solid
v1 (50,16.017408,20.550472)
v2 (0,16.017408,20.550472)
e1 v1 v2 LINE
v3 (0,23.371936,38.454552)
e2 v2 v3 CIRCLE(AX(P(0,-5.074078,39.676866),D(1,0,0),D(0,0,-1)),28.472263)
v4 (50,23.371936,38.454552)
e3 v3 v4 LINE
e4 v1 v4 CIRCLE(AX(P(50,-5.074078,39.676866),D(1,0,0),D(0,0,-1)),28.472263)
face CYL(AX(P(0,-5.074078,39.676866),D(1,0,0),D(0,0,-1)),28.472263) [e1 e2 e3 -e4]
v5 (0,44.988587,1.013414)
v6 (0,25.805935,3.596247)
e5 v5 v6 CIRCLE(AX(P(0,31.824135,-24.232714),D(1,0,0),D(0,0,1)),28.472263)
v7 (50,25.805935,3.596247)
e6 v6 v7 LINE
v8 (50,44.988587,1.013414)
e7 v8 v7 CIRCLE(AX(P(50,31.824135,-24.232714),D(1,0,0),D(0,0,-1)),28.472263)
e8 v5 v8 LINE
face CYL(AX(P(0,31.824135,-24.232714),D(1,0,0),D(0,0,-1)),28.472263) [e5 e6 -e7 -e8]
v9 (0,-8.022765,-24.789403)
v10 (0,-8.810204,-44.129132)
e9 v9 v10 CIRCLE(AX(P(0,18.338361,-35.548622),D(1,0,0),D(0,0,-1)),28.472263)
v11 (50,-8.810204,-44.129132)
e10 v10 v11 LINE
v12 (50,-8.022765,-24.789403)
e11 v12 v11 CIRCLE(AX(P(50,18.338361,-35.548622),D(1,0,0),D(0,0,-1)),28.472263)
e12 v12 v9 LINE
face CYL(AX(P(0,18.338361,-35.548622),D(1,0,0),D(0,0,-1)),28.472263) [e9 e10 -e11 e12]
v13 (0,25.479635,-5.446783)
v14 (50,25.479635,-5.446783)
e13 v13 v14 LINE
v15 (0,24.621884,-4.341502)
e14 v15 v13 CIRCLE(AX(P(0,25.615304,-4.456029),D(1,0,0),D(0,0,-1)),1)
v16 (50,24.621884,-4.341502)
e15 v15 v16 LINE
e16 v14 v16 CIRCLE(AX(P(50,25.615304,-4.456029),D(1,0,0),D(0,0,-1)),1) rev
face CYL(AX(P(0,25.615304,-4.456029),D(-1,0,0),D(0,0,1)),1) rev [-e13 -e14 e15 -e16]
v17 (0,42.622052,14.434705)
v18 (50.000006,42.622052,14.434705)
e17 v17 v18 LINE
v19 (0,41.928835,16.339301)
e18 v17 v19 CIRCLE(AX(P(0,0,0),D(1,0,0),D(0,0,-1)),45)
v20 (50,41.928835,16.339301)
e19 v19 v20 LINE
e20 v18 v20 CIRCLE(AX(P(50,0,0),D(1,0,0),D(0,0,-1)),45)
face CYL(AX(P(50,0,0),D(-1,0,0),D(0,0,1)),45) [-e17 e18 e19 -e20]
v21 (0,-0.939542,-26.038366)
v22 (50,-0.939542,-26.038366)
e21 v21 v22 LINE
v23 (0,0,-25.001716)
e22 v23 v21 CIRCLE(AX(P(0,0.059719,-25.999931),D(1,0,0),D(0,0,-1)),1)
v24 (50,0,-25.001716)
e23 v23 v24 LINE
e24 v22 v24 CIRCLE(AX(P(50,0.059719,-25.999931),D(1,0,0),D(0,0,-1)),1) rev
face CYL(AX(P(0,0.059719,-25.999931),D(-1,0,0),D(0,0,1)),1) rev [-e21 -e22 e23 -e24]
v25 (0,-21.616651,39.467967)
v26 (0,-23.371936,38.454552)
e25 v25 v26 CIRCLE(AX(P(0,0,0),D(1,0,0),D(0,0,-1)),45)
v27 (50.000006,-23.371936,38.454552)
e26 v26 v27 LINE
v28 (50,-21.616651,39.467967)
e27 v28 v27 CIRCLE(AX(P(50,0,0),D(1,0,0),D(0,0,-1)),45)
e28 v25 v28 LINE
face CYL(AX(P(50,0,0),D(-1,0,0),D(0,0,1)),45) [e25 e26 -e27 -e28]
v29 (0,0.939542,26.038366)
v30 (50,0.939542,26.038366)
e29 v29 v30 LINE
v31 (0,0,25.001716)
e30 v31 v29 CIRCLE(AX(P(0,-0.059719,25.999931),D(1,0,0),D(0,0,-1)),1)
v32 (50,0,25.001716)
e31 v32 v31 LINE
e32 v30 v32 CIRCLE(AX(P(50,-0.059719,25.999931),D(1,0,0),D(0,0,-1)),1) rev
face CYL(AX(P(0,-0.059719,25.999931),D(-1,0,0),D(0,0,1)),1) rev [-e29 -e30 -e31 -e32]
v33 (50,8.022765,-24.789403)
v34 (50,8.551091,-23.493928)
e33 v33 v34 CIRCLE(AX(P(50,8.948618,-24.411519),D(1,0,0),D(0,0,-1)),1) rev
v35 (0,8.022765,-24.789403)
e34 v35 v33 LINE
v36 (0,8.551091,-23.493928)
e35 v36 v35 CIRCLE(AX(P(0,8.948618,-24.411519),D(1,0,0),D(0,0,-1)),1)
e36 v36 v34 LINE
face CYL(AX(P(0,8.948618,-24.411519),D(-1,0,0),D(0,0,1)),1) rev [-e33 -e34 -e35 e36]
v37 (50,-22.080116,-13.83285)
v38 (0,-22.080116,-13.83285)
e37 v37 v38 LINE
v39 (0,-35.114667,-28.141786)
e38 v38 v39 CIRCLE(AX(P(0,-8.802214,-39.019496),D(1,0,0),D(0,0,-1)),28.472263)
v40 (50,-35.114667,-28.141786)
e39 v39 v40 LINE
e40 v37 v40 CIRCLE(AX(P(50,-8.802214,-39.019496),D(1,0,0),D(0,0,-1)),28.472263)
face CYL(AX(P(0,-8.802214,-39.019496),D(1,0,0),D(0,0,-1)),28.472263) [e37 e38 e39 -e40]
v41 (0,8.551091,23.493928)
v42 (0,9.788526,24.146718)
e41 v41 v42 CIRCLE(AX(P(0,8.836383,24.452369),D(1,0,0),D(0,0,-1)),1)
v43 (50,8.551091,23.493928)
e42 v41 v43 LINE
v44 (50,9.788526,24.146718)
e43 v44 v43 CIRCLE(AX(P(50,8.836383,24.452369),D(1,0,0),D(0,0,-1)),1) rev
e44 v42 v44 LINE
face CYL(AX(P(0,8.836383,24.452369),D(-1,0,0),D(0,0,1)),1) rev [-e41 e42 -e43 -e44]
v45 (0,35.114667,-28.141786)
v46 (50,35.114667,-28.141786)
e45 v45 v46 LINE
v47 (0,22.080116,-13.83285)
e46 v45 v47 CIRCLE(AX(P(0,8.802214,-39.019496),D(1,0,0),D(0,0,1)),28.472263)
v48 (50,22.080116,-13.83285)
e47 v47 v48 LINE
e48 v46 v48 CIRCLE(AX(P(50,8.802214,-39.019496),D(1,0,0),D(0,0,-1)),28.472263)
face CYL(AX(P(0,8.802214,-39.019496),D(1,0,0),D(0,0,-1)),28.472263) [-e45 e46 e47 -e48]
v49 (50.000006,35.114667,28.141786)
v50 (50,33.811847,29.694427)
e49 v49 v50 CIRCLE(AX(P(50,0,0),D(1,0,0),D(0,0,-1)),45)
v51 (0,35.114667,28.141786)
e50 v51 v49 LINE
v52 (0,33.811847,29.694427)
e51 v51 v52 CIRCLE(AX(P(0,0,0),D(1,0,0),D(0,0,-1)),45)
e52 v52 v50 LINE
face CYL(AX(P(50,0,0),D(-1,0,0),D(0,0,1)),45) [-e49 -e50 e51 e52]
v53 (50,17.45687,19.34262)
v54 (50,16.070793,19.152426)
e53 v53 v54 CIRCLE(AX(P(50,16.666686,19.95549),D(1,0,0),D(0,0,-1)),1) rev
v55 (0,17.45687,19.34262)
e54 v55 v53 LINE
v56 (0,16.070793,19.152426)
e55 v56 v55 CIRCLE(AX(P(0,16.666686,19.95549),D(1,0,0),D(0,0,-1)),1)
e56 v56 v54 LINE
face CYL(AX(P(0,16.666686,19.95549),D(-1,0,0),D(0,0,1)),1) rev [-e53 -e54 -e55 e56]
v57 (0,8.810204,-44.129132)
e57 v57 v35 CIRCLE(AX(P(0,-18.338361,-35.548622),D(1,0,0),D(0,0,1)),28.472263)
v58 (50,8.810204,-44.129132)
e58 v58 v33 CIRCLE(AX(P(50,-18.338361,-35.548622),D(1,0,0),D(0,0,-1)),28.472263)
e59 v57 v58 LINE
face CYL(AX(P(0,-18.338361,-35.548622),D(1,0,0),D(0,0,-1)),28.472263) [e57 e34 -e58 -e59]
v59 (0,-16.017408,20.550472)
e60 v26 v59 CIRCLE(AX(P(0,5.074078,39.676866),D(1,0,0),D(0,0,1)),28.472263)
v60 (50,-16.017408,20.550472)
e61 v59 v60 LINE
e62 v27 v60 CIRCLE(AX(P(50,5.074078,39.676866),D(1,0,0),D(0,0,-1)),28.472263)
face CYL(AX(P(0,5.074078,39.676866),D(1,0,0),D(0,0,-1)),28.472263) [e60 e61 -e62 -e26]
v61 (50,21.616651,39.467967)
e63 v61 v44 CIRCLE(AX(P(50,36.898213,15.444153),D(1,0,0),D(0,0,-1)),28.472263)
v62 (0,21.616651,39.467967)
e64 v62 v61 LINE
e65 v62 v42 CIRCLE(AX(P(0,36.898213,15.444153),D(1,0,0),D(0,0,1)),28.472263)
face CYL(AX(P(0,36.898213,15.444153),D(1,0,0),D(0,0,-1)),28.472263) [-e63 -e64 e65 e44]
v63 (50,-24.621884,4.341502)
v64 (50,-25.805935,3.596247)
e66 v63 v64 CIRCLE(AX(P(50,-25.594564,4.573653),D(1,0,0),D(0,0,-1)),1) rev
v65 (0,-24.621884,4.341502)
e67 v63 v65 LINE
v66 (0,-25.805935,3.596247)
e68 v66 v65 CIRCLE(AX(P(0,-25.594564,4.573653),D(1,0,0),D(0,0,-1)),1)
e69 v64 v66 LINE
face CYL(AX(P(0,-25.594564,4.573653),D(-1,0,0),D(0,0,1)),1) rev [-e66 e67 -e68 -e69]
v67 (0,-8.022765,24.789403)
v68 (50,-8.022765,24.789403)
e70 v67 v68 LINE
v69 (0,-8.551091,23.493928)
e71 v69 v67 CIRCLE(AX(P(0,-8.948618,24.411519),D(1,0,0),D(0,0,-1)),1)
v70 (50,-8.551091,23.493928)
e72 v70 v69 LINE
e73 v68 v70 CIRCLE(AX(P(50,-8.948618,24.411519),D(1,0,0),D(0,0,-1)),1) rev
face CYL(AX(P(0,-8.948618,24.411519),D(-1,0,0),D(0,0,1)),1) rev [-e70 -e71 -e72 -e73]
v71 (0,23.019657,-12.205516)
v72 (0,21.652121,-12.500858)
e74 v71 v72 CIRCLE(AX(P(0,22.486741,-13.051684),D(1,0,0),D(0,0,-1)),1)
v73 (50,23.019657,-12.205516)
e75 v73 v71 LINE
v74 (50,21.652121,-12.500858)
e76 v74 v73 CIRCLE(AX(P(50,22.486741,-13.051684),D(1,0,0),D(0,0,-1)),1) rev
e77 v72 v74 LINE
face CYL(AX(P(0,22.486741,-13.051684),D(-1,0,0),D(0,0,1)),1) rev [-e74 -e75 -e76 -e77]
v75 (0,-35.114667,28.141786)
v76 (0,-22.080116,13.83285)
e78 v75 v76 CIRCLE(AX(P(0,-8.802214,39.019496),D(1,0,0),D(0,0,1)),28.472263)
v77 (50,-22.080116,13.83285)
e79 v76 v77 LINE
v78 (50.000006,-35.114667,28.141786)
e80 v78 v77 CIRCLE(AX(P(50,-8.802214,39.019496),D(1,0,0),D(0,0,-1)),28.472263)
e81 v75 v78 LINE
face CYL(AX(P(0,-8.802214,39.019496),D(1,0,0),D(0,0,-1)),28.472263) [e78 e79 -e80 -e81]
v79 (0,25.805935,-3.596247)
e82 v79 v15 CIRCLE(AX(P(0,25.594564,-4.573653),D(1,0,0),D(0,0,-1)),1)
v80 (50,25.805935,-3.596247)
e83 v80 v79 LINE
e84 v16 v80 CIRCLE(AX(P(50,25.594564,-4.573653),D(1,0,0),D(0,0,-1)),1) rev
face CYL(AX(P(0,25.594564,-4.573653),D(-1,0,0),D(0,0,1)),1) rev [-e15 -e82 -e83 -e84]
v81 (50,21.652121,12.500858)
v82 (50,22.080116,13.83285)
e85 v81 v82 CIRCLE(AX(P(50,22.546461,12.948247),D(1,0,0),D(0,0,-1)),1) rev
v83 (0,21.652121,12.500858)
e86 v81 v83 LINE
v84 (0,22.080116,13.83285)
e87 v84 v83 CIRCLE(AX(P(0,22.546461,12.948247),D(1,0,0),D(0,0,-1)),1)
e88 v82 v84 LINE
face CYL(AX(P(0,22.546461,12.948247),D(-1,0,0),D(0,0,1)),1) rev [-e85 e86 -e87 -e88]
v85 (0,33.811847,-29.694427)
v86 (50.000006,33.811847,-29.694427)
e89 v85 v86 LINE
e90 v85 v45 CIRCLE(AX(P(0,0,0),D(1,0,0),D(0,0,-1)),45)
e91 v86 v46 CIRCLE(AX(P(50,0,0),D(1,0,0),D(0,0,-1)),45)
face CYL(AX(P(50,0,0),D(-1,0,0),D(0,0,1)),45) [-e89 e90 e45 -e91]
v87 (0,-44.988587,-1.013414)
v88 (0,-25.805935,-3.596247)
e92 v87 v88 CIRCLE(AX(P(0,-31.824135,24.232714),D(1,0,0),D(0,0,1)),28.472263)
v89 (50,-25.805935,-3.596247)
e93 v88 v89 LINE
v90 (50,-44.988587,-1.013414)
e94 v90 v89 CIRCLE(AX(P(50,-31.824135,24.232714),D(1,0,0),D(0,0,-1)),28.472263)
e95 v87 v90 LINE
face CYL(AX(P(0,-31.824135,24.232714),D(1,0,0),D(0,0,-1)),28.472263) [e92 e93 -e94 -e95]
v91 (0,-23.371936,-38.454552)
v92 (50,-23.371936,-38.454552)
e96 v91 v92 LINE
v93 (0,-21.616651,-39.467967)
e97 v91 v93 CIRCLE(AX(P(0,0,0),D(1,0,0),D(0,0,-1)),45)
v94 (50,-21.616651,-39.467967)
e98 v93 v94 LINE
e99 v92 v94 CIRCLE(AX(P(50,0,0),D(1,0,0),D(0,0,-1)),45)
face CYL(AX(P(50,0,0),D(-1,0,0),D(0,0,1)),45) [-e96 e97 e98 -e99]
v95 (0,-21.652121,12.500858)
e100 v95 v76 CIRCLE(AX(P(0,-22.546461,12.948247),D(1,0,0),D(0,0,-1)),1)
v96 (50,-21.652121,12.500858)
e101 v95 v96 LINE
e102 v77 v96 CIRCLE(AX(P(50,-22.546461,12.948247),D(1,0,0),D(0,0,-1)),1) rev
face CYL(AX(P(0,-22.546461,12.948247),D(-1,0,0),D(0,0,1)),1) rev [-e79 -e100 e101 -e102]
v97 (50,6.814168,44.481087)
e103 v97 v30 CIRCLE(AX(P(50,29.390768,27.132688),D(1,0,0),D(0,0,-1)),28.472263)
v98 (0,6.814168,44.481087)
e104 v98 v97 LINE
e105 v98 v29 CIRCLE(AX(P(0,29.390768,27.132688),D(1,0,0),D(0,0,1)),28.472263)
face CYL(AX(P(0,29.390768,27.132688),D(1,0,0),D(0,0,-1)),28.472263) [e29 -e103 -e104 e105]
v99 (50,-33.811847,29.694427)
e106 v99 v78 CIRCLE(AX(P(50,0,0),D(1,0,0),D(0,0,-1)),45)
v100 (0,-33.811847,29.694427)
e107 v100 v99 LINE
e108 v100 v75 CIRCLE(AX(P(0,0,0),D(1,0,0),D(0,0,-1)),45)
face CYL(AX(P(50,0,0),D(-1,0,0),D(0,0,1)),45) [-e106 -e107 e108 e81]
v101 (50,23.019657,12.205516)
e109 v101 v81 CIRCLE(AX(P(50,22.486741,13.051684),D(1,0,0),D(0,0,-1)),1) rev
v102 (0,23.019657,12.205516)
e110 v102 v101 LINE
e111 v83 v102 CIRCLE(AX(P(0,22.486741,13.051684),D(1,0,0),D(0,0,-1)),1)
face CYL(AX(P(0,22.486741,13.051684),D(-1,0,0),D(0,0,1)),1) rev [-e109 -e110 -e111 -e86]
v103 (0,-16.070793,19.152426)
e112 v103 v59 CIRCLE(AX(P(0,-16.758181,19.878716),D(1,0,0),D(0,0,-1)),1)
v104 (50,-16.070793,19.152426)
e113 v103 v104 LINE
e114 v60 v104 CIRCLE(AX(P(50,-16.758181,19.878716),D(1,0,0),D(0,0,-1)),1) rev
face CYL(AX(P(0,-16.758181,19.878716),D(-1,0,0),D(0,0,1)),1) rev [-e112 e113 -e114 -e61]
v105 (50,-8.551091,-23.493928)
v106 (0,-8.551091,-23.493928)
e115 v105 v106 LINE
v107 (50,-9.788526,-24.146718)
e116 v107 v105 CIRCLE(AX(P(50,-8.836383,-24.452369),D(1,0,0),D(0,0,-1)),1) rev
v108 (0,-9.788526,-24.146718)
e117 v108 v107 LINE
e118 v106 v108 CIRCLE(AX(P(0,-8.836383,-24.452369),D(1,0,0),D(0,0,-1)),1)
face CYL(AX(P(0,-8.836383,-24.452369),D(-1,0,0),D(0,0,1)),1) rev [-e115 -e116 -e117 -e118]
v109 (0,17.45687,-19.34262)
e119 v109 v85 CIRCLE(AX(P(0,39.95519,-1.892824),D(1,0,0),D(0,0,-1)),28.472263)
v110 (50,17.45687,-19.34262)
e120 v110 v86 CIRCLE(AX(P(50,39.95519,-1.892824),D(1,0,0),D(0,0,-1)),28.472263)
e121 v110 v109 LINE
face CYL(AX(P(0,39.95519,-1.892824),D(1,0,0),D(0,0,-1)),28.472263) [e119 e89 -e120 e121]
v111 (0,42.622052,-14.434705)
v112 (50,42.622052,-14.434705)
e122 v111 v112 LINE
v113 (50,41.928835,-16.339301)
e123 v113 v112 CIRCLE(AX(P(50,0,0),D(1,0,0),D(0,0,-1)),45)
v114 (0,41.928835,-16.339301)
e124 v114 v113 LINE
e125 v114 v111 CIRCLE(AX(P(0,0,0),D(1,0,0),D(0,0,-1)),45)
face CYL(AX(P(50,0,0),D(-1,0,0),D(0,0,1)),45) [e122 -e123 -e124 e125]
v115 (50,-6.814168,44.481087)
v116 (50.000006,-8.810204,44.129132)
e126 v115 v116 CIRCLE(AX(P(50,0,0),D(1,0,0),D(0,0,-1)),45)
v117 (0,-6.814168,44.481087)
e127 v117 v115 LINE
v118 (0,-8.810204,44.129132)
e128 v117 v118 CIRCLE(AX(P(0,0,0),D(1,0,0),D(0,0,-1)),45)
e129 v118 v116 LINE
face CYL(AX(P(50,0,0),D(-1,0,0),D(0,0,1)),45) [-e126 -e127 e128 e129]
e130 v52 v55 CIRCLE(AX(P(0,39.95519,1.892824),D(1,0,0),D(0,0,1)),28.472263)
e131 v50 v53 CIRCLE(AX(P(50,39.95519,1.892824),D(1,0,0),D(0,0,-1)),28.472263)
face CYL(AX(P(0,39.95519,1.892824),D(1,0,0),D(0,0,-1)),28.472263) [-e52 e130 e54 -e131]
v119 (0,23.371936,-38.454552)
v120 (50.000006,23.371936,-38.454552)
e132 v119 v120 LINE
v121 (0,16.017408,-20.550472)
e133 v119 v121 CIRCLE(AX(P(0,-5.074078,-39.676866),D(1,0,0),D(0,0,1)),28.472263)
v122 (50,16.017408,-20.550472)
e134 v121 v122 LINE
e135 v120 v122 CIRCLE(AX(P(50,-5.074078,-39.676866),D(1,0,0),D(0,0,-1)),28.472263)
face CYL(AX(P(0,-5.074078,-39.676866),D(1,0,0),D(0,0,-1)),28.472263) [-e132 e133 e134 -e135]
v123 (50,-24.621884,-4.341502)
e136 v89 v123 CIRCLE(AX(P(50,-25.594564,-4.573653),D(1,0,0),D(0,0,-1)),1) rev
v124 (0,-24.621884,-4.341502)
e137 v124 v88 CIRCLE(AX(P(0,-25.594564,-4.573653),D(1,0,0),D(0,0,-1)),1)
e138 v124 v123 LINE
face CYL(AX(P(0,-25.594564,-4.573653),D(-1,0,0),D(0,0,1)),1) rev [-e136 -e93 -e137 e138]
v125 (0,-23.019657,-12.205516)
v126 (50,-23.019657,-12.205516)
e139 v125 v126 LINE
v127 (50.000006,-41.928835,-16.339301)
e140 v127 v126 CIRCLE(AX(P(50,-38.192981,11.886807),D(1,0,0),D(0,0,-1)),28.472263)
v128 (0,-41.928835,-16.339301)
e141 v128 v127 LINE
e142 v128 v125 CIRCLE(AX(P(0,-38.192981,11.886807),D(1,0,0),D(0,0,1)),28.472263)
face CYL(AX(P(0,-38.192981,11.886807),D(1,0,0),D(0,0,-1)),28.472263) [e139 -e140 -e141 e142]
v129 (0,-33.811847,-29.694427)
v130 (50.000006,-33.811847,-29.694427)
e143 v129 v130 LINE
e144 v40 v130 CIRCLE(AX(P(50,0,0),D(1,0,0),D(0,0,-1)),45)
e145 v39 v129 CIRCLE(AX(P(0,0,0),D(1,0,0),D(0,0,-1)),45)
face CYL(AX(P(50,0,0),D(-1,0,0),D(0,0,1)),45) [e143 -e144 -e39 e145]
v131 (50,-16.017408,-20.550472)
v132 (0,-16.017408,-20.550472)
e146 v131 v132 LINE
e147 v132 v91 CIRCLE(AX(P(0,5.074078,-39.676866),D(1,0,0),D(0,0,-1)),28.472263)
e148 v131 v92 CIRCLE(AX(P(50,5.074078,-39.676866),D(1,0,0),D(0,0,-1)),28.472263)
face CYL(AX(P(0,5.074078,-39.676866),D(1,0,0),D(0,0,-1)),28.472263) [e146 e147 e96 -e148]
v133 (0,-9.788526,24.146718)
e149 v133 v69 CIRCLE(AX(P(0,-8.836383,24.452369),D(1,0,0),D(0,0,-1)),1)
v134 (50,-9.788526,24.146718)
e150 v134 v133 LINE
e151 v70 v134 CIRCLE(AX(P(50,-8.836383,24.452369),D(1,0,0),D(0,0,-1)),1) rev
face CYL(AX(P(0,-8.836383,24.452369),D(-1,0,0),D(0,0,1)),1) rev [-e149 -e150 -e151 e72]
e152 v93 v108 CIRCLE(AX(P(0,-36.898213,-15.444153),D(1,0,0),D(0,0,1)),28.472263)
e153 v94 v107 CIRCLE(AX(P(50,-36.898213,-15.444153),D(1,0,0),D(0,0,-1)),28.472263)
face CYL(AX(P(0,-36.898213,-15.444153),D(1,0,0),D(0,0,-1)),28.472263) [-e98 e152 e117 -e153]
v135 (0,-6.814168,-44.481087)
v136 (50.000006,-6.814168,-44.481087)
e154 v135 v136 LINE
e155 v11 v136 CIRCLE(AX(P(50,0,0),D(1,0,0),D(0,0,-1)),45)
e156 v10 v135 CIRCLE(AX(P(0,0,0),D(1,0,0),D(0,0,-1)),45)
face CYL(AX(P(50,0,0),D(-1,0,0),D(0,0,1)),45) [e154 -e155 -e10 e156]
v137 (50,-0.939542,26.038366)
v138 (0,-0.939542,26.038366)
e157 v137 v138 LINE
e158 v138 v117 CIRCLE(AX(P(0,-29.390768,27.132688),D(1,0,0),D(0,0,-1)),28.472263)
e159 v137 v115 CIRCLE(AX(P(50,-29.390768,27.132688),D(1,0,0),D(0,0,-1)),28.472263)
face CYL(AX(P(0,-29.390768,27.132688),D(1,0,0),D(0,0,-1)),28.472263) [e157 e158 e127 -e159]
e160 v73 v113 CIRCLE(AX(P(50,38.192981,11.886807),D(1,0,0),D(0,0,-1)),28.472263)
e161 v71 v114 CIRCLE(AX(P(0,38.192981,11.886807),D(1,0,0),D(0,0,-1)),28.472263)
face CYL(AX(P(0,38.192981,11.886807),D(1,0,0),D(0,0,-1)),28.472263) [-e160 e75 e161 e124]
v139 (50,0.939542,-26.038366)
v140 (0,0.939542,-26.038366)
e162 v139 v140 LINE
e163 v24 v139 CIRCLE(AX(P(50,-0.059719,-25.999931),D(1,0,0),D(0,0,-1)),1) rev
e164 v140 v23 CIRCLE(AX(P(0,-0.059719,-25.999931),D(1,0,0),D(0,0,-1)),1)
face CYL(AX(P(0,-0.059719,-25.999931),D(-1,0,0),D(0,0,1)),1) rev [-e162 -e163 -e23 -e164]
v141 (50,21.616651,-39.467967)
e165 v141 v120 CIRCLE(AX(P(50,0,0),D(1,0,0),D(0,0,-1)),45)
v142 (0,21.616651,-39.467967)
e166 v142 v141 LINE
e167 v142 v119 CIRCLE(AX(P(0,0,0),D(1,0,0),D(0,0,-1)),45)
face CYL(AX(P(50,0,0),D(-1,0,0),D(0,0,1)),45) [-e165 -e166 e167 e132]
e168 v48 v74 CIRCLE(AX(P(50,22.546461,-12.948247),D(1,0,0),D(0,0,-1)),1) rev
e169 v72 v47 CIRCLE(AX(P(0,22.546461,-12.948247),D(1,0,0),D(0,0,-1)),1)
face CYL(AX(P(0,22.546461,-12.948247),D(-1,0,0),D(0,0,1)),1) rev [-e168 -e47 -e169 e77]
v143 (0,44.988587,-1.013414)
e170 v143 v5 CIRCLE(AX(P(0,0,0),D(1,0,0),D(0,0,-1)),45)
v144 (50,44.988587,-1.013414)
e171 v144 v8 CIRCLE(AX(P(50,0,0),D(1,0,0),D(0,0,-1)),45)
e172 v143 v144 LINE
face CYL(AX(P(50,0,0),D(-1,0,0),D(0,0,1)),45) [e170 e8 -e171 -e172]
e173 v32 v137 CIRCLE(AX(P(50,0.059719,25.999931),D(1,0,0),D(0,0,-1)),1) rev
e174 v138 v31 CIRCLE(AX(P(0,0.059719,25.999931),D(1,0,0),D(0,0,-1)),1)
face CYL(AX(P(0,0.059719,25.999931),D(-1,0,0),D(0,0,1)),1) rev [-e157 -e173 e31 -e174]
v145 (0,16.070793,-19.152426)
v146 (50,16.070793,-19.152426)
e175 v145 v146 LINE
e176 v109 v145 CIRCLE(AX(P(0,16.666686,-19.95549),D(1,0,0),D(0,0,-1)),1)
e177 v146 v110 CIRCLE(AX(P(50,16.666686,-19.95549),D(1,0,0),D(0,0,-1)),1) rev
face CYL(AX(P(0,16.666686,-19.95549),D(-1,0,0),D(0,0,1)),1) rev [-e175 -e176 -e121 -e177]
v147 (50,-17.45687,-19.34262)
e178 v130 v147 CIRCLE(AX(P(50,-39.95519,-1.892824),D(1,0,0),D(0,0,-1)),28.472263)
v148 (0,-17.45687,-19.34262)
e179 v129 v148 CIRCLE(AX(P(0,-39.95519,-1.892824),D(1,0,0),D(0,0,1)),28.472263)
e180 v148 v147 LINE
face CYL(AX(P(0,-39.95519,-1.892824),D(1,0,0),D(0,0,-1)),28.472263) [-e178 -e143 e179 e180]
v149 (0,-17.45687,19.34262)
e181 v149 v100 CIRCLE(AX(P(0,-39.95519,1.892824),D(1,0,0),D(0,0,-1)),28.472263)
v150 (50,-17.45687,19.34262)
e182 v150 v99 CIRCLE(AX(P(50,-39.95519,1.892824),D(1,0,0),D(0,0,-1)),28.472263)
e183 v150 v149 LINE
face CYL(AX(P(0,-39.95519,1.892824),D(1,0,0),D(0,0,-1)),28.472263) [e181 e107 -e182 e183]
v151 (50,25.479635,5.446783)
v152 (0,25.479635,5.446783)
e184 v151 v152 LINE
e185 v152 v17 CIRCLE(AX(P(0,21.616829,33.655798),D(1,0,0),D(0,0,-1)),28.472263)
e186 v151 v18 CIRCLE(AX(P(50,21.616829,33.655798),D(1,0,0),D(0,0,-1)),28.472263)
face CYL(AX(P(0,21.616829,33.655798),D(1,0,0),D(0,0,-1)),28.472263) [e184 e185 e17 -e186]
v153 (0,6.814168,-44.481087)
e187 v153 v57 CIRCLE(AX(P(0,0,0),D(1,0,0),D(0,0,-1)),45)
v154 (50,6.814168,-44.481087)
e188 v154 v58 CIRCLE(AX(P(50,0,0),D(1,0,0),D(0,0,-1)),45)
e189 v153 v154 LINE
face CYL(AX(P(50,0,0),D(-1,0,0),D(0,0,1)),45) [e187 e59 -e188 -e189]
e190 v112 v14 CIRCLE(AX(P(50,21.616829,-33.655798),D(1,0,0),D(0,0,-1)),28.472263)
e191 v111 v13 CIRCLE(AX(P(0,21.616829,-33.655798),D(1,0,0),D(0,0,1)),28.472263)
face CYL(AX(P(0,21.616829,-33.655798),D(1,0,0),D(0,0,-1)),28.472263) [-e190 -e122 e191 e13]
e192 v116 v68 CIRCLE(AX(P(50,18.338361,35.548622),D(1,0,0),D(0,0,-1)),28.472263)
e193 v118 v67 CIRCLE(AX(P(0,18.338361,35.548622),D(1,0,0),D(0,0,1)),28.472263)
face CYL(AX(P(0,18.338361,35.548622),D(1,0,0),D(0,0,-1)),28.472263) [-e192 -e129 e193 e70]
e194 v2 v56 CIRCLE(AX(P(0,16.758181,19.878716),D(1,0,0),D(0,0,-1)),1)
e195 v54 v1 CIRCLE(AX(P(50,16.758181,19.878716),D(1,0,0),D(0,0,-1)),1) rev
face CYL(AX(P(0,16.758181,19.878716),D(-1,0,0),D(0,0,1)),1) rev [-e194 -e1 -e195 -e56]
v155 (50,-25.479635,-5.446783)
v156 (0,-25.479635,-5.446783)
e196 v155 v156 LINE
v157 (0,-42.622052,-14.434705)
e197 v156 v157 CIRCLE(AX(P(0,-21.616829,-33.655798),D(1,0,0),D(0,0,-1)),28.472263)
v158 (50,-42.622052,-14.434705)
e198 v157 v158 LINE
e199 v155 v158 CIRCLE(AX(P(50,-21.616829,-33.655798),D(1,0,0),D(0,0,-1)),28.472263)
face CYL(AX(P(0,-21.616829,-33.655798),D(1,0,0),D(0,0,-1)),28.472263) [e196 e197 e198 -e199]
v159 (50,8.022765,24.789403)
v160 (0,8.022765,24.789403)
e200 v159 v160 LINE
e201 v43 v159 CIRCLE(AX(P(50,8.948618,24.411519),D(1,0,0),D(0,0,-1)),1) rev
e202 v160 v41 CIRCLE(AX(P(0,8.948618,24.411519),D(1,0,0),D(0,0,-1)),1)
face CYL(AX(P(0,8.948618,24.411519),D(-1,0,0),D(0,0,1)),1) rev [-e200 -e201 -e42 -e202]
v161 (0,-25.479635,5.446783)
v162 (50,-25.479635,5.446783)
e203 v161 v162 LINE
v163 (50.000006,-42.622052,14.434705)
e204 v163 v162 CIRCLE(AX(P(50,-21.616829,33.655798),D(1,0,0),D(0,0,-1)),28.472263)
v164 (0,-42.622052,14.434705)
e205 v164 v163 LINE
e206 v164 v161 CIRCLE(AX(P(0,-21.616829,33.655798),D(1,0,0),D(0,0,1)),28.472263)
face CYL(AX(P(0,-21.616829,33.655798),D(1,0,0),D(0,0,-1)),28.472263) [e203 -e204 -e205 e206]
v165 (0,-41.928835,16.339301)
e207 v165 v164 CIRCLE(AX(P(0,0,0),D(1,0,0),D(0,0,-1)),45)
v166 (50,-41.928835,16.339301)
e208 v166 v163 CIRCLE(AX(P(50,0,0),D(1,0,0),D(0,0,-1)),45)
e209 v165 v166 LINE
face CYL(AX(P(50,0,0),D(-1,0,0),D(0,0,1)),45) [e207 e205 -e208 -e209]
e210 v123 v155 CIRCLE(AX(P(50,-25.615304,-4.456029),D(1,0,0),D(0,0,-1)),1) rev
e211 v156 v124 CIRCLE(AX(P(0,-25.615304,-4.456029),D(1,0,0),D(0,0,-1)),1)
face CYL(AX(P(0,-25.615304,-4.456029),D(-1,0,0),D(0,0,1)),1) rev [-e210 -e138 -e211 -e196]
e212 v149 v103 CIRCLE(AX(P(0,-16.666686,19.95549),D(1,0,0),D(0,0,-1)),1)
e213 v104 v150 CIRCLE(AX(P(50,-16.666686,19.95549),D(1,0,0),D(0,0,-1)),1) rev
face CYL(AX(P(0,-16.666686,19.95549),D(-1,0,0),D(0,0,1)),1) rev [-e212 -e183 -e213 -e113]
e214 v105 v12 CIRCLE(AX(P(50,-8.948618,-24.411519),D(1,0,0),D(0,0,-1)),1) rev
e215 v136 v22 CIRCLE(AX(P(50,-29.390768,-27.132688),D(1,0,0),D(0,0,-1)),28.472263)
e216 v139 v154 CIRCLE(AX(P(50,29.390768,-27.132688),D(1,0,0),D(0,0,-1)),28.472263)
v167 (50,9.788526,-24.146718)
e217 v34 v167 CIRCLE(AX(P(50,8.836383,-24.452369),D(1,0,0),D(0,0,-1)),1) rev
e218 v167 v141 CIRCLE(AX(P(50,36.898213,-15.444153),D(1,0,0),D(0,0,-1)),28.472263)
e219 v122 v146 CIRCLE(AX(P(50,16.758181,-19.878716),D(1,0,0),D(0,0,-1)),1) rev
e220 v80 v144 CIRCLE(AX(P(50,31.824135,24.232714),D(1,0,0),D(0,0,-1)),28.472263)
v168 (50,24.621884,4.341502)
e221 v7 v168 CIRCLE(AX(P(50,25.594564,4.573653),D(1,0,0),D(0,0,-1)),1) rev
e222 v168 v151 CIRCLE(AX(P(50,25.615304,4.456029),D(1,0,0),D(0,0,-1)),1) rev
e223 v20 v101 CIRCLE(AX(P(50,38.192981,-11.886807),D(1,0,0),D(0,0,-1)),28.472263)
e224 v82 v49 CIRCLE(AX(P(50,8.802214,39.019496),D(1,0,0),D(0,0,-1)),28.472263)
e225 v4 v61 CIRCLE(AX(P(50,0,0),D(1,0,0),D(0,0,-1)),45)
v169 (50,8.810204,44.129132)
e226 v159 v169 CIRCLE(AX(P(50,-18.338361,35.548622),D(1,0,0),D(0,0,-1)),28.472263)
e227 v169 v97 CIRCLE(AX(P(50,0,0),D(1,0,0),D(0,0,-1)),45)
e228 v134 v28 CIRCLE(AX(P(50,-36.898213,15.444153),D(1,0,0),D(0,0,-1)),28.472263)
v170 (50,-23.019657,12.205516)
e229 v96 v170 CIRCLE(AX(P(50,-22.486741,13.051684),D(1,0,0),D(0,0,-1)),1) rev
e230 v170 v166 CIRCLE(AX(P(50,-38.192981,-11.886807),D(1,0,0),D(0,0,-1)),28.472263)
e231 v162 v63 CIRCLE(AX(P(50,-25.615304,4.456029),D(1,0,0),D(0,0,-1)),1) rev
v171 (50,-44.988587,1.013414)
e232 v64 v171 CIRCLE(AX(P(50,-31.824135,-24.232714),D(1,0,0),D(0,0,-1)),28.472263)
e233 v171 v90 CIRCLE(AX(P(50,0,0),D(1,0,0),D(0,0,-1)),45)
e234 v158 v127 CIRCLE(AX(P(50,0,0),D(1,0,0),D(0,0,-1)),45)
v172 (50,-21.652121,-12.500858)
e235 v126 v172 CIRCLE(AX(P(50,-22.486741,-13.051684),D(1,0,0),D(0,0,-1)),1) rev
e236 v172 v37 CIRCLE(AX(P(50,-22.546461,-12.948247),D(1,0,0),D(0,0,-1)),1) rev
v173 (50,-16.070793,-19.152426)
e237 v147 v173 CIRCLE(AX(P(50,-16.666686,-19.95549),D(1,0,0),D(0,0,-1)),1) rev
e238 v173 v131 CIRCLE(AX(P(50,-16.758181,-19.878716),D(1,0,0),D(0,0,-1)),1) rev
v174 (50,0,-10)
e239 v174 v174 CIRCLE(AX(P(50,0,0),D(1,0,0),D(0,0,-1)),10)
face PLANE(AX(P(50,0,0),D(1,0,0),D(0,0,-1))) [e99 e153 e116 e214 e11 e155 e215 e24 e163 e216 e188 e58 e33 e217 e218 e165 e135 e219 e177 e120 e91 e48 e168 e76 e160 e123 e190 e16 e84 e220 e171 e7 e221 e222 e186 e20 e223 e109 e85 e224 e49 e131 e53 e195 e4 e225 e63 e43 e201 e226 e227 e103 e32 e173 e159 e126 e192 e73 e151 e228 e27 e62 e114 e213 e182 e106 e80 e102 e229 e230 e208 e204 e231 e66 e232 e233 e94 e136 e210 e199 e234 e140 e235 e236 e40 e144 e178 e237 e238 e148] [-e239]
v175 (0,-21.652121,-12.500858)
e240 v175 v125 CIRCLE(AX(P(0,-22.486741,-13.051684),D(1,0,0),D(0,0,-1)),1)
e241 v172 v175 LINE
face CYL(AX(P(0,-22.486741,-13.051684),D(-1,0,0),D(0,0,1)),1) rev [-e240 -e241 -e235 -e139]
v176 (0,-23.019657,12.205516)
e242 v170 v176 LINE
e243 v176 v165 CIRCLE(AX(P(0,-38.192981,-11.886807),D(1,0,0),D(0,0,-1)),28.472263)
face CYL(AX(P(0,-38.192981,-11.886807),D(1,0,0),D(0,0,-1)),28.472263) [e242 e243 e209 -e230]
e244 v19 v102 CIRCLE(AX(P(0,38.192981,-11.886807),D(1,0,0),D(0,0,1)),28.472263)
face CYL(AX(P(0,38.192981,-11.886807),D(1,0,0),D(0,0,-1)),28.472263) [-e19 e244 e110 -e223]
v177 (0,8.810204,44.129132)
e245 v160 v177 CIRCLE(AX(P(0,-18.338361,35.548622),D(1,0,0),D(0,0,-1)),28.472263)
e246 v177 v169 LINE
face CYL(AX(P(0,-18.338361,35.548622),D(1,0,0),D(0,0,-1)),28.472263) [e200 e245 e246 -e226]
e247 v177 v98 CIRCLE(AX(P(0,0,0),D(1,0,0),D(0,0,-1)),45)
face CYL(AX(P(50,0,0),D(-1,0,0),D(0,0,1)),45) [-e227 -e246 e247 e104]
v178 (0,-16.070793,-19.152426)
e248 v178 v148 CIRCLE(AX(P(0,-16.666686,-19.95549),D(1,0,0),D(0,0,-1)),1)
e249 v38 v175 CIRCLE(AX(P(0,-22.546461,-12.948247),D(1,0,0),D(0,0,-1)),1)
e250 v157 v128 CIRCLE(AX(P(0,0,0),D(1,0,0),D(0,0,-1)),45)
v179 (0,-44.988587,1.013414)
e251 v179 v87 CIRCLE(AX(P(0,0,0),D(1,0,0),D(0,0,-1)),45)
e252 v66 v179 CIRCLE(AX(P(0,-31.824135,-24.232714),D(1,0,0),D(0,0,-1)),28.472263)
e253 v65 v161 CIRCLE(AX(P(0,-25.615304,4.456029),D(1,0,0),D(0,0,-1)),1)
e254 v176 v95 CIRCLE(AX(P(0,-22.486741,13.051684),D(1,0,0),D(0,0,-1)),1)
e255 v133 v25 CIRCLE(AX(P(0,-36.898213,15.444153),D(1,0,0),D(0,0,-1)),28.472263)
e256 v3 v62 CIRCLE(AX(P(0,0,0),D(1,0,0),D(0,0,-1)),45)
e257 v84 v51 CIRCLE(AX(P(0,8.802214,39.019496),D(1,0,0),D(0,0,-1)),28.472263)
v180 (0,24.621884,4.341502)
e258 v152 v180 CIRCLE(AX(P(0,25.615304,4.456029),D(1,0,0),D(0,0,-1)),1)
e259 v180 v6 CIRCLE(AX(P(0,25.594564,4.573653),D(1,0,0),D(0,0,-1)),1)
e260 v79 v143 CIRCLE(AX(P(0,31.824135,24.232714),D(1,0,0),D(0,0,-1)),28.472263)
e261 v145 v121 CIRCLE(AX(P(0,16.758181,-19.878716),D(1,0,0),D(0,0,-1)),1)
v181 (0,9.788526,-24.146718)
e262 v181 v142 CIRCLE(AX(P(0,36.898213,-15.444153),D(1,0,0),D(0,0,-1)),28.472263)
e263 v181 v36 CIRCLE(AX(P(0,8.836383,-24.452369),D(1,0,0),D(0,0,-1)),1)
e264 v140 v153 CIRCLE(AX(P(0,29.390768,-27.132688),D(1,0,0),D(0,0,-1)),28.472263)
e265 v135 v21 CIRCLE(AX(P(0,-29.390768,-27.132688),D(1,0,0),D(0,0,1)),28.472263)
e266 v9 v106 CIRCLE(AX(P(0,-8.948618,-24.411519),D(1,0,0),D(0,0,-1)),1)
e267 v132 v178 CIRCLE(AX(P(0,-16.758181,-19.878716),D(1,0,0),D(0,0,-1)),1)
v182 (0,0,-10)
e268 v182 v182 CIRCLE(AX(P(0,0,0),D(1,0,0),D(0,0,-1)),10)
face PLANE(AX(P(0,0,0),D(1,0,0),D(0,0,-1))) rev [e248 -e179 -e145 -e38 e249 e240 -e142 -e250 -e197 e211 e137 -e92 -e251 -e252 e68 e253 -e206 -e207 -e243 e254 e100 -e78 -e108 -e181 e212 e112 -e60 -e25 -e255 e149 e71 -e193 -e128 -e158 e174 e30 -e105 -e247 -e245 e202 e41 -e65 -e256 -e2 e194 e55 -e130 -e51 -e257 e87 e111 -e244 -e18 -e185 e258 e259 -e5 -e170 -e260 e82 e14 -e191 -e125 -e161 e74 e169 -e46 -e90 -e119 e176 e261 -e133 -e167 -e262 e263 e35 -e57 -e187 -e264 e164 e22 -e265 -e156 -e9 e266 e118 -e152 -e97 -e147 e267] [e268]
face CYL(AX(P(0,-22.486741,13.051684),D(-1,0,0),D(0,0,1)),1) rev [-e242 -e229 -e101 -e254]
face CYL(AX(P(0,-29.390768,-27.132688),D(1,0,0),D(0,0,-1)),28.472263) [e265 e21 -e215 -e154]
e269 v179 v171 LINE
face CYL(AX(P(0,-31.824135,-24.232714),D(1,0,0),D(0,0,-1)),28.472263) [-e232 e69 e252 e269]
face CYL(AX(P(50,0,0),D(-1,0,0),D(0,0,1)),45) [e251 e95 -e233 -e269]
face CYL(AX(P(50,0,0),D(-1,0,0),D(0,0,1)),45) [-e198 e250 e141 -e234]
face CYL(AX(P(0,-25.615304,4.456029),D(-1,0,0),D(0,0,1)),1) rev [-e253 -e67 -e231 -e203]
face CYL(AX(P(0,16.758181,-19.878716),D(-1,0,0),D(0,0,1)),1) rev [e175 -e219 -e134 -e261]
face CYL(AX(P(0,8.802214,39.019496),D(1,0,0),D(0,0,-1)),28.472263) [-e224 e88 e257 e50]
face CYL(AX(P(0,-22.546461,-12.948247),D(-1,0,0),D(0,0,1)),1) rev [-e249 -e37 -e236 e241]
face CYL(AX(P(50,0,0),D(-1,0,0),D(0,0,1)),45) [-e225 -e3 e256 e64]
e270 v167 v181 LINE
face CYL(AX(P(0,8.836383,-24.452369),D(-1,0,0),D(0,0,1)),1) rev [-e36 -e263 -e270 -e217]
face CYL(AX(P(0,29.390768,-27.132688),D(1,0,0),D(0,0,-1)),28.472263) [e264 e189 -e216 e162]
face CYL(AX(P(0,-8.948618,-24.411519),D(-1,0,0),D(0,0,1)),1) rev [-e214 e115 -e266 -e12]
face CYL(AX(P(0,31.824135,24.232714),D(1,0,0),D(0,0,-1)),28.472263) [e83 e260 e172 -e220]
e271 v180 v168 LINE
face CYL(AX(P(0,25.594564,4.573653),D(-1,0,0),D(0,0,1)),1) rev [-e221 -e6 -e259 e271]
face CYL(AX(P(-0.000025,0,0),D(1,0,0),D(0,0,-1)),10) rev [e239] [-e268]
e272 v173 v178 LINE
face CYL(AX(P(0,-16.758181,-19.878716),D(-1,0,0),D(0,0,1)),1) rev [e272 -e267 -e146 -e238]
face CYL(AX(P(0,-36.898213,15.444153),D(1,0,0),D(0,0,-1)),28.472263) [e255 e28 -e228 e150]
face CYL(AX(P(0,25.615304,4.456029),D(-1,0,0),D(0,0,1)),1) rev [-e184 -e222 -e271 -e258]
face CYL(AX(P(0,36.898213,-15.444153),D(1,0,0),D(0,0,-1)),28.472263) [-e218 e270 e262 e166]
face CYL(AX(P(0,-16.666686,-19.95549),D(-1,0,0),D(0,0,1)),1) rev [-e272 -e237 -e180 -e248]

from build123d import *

# Parameters (mm, degrees)
SKETCH1_R               = 45
BOSS_EXTRUDE1_DEPTH     = 50
CUT_EXTRUDE1_DEPTH      = 81.932070281
CUT_EXTRUDE1_DEPTH_BACK = 81.932070281
SKETCH2_OUTSIDE_W       = 119.35
SKETCH2_OUTSIDE_H       = 119.35
FILLET4_R               = 1
FILLET5_R               = 1
CUT_EXTRUDE2_DEPTH      = 81.644696754
CUT_EXTRUDE2_DEPTH_BACK = 81.644696754
SKETCH3_R               = 10


with BuildPart() as part:
    # Sketch1 → Boss-Extrude1 (new body)
    with BuildSketch(Plane.YZ):
        with Locations(Location((0, 0, 0), (0, 0, 270))):
            Circle(SKETCH1_R)
    extrude(amount=BOSS_EXTRUDE1_DEPTH)

    # Sketch2 outside → Cut-Extrude1 (cut, two sides: drawn at the far end of the back side and taken through both)
    with BuildSketch(Plane.YZ.offset(50).offset(-CUT_EXTRUDE1_DEPTH_BACK)):
        Rectangle(SKETCH2_OUTSIDE_W, SKETCH2_OUTSIDE_H)
        with BuildLine():
            ThreePointArc((8.810204422, 44.129132079), (7.814167995, 44.316348886), (6.814167995, 44.481087156))
            ThreePointArc((6.814167995, 44.481087156), (2.105399573, 35.267704069), (1, 24.979991994))
            ThreePointArc((1, 24.979991994), (0, 25), (-1, 24.979991994))
            ThreePointArc((-1, 24.979991994), (-2.105399573, 35.267704069), (-6.814167995, 44.481087156))
            ThreePointArc((-6.814167995, 44.481087156), (-7.814167995, 44.316348886), (-8.810204422, 44.129132079))
            ThreePointArc((-8.810204422, 44.129132079), (-10.083836757, 33.860890329), (-7.603967821, 23.815534287))
            ThreePointArc((-7.603967821, 23.815534287), (-8.550503583, 23.49231552), (-9.483353063, 23.131494))
            ThreePointArc((-9.483353063, 23.131494), (-14.040693643, 32.420712202), (-21.616651186, 39.46796665))
            ThreePointArc((-21.616651186, 39.46796665), (-22.5, 38.97114317), (-23.371936162, 38.454552397))
            ThreePointArc((-23.371936162, 38.454552397), (-21.056813554, 28.369953482), (-15.2907849, 19.778571666))
            ThreePointArc((-15.2907849, 19.778571666), (-16.069690242, 19.151111078), (-16.822873787, 18.492996446))
            ThreePointArc((-16.822873787, 18.492996446), (-24.282472841, 25.663303964), (-33.811847216, 29.694426882))
            ThreePointArc((-33.811847216, 29.694426882), (-34.47199994, 28.925442436), (-35.114667467, 28.141786167))
            ThreePointArc((-35.114667467, 28.141786167), (-29.49002787, 19.45718155), (-21.133307653, 13.356021401))
            ThreePointArc((-21.133307653, 13.356021401), (-21.650635095, 12.5), (-22.133307653, 11.623970593))
            ThreePointArc((-22.133307653, 11.623970593), (-31.595427443, 15.810522519), (-41.928835462, 16.339300988))
            ThreePointArc((-41.928835462, 16.339300988), (-42.286167935, 15.39090645), (-42.622051639, 14.434705197))
            ThreePointArc((-42.622051639, 14.434705197), (-34.366309599, 8.197586365), (-24.426841608, 5.322537841))
            ThreePointArc((-24.426841608, 5.322537841), (-24.620193825, 4.341204442), (-24.774137963, 3.352922335))
            ThreePointArc((-24.774137963, 3.352922335), (-35.097507197, 4.050758719), (-44.988587348, 1.013414253))
            ThreePointArc((-44.988587348, 1.013414253), (-45, 0), (-44.988587348, -1.013414253))
            ThreePointArc((-44.988587348, -1.013414253), (-35.097507197, -4.050758719), (-24.774137963, -3.352922335))
            ThreePointArc((-24.774137963, -3.352922335), (-24.620193825, -4.341204442), (-24.426841608, -5.322537841))
            ThreePointArc((-24.426841608, -5.322537841), (-34.366309599, -8.197586365), (-42.622051639, -14.434705197))
            ThreePointArc((-42.622051639, -14.434705197), (-42.286167935, -15.39090645), (-41.928835462, -16.339300988))
            ThreePointArc((-41.928835462, -16.339300988), (-31.595427443, -15.810522519), (-22.133307653, -11.623970593))
            ThreePointArc((-22.133307653, -11.623970593), (-21.650635095, -12.5), (-21.133307653, -13.356021401))
            ThreePointArc((-21.133307653, -13.356021401), (-29.49002787, -19.45718155), (-35.114667467, -28.141786167))
            ThreePointArc((-35.114667467, -28.141786167), (-34.47199994, -28.925442436), (-33.811847216, -29.694426882))
            ThreePointArc((-33.811847216, -29.694426882), (-24.282472841, -25.663303964), (-16.822873787, -18.492996446))
            ThreePointArc((-16.822873787, -18.492996446), (-16.069690242, -19.151111078), (-15.2907849, -19.778571666))
            ThreePointArc((-15.2907849, -19.778571666), (-21.056813554, -28.369953482), (-23.371936162, -38.454552397))
            ThreePointArc((-23.371936162, -38.454552397), (-22.5, -38.97114317), (-21.616651186, -39.46796665))
            ThreePointArc((-21.616651186, -39.46796665), (-14.040693643, -32.420712202), (-9.483353063, -23.131494))
            ThreePointArc((-9.483353063, -23.131494), (-8.550503583, -23.49231552), (-7.603967821, -23.815534287))
            ThreePointArc((-7.603967821, -23.815534287), (-10.083836757, -33.860890329), (-8.810204423, -44.129132079))
            ThreePointArc((-8.810204423, -44.129132079), (-7.814167995, -44.316348886), (-6.814167995, -44.481087156))
            ThreePointArc((-6.814167995, -44.481087156), (-2.105399573, -35.267704069), (-1, -24.979991994))
            ThreePointArc((-1, -24.979991994), (0, -25), (1, -24.979991994))
            ThreePointArc((1, -24.979991994), (2.105399573, -35.267704069), (6.814167995, -44.481087156))
            ThreePointArc((6.814167995, -44.481087156), (7.814167995, -44.316348886), (8.810204422, -44.129132079))
            ThreePointArc((8.810204422, -44.129132079), (10.083836757, -33.860890329), (7.603967821, -23.815534287))
            ThreePointArc((7.603967821, -23.815534287), (8.550503583, -23.49231552), (9.483353063, -23.131494))
            ThreePointArc((9.483353063, -23.131494), (14.040693643, -32.420712202), (21.616651186, -39.46796665))
            ThreePointArc((21.616651186, -39.46796665), (22.5, -38.97114317), (23.371936162, -38.454552397))
            ThreePointArc((23.371936162, -38.454552397), (21.056813554, -28.369953482), (15.2907849, -19.778571666))
            ThreePointArc((15.2907849, -19.778571666), (16.069690242, -19.151111078), (16.822873787, -18.492996446))
            ThreePointArc((16.822873787, -18.492996446), (24.282472841, -25.663303964), (33.811847216, -29.694426882))
            ThreePointArc((33.811847216, -29.694426882), (34.47199994, -28.925442436), (35.114667467, -28.141786167))
            ThreePointArc((35.114667467, -28.141786167), (29.49002787, -19.45718155), (21.133307653, -13.356021401))
            ThreePointArc((21.133307653, -13.356021401), (21.650635095, -12.5), (22.133307653, -11.623970593))
            ThreePointArc((22.133307653, -11.623970593), (31.595427443, -15.810522519), (41.928835462, -16.339300988))
            ThreePointArc((41.928835462, -16.339300988), (42.286167935, -15.39090645), (42.622051639, -14.434705197))
            ThreePointArc((42.622051639, -14.434705197), (34.366309599, -8.197586365), (24.426841608, -5.322537841))
            ThreePointArc((24.426841608, -5.322537841), (24.620193825, -4.341204442), (24.774137963, -3.352922335))
            ThreePointArc((24.774137963, -3.352922335), (35.097507197, -4.050758719), (44.988587348, -1.013414253))
            ThreePointArc((44.988587348, -1.013414253), (45, 0), (44.988587348, 1.013414253))
            ThreePointArc((44.988587348, 1.013414253), (35.097507197, 4.050758719), (24.774137963, 3.352922335))
            ThreePointArc((24.774137963, 3.352922335), (24.620193825, 4.341204442), (24.426841608, 5.322537841))
            ThreePointArc((24.426841608, 5.322537841), (34.366309599, 8.197586365), (42.622051639, 14.434705197))
            ThreePointArc((42.622051639, 14.434705197), (42.286167935, 15.39090645), (41.928835462, 16.339300988))
            ThreePointArc((41.928835462, 16.339300988), (31.595427443, 15.810522519), (22.133307653, 11.623970593))
            ThreePointArc((22.133307653, 11.623970593), (21.650635095, 12.5), (21.133307653, 13.356021401))
            ThreePointArc((21.133307653, 13.356021401), (29.49002787, 19.45718155), (35.114667467, 28.141786167))
            ThreePointArc((35.114667467, 28.141786167), (34.47199994, 28.925442436), (33.811847216, 29.694426882))
            ThreePointArc((33.811847216, 29.694426882), (24.282472841, 25.663303964), (16.822873787, 18.492996446))
            ThreePointArc((16.822873787, 18.492996446), (16.069690242, 19.151111078), (15.2907849, 19.778571666))
            ThreePointArc((15.2907849, 19.778571666), (21.056813554, 28.369953482), (23.371936162, 38.454552397))
            ThreePointArc((23.371936162, 38.454552397), (22.5, 38.97114317), (21.616651186, 39.46796665))
            ThreePointArc((21.616651186, 39.46796665), (14.040693643, 32.420712202), (9.483353063, 23.131494))
            ThreePointArc((9.483353063, 23.131494), (8.550503583, 23.49231552), (7.603967821, 23.815534287))
            ThreePointArc((7.603967821, 23.815534287), (10.083836757, 33.860890329), (8.810204422, 44.129132079))
        make_face(mode=Mode.SUBTRACT)
    extrude(amount=CUT_EXTRUDE1_DEPTH + CUT_EXTRUDE1_DEPTH_BACK, mode=Mode.SUBTRACT)

    # Fillet4
    # the kernel refuses this fillet: 1 mm, written as the material it adds along each edge
    with BuildSketch(Plane(origin=(0, 9.483353063, 23.131494), x_dir=(0, -0.9330765030084109, 0.35967796642774086), z_dir=(1, 0, 0))) as fillet4_piece_1:
        with BuildLine():
            CenterArc((1.078762588, -0.999776267), FILLET4_R, 91.212022614, 92.071085144)
            ThreePointArc((0.080403843, -1.057045955), (0.045121933, -0.528148739), (0, 0))
            ThreePointArc((0, 0), (0.52880519, -0.005593324), (1.05761038, 0))
        make_face()
    extrude(amount=50)
    with BuildSketch(Plane(origin=(0, 7.603967821, 23.815534287), x_dir=(0, 0.3950547344485719, 0.9186575840811246), z_dir=(1, 0, 0))) as fillet4_piece_2:
        with BuildLine():
            CenterArc((1.078715845, -0.999826701), FILLET4_R, 91.066700156, 92.071085144)
            ThreePointArc((0.080215055, -1.054564015), (0.045684741, -0.526857779), (0, 0))
            ThreePointArc((0, 0), (0.530049745, -0.004934224), (1.06009949, 0))
        make_face()
    extrude(amount=50)

    # Fillet5
    # the kernel refuses this fillet: 1 mm, written as the material it adds along each edge
    with BuildSketch(Plane(origin=(0, -1, 24.979991994), x_dir=(0, 0.9998222141344254, 0.018855771618662743), z_dir=(1, 0, 0)), Plane(origin=(0, -9.483353063, 23.131494), x_dir=(0, 0.9330765030084159, 0.35967796642772726), z_dir=(1, 0, 0)), Plane(origin=(0, -16.822873787, 18.492996446), x_dir=(0, 0.7537879948770314, 0.6571176902041708), z_dir=(1, 0, 0)), Plane(origin=(0, -22.133307653, 11.623970593), x_dir=(0, 0.48358152983748676, 0.8752993225177523), z_dir=(1, 0, 0)), Plane(origin=(0, -24.774137963, 3.352922335), x_dir=(0, 0.1550479953962816, 0.9879069384934973), z_dir=(1, 0, 0)), Plane(origin=(0, -24.426841608, -5.322537841), x_dir=(0, -0.19218661555444733, 0.9813583977333291), z_dir=(1, 0, 0)), Plane(origin=(0, -21.133307653, -13.356021401), x_dir=(0, -0.5162406842969376, 0.8564435508990826), z_dir=(1, 0, 0)), Plane(origin=(0, -15.2907849, -19.778571666), x_dir=(0, -0.7780285076121528, 0.628228972065764), z_dir=(1, 0, 0)), Plane(origin=(0, -7.603967821, -23.815534287), x_dir=(0, -0.9459746104314817, 0.3242407075291545), z_dir=(1, 0, 0)), Plane(origin=(0, 1, -24.979991994), x_dir=(0, -0.9998222141344254, -0.018855771618666053), z_dir=(1, 0, 0)), Plane(origin=(0, 9.483353063, -23.131494), x_dir=(0, -0.9330765030084167, -0.35967796642772554), z_dir=(1, 0, 0)), Plane(origin=(0, 16.822873787, -18.492996446), x_dir=(0, -0.7537879948770301, -0.6571176902041721), z_dir=(1, 0, 0)), Plane(origin=(0, 22.133307653, -11.623970593), x_dir=(0, -0.483581529837466, -0.8752993225177635), z_dir=(1, 0, 0)), Plane(origin=(0, 24.774137963, -3.352922335), x_dir=(0, -0.1550479953962692, -0.9879069384934992), z_dir=(1, 0, 0)), Plane(origin=(0, 24.426841608, 5.322537841), x_dir=(0, 0.19218661555446737, -0.9813583977333252), z_dir=(1, 0, 0)), Plane(origin=(0, 21.133307653, 13.356021401), x_dir=(0, 0.5162406842969336, -0.8564435508990849), z_dir=(1, 0, 0)), Plane(origin=(0, 15.2907849, 19.778571666), x_dir=(0, 0.7780285076121564, -0.6282289720657595), z_dir=(1, 0, 0))) as fillet5_piece_1:
        with BuildLine():
            CenterArc((1.078762588, 0.999776267), FILLET5_R, 176.716892242, 92.071085144)
            ThreePointArc((0.080403843, 1.057045955), (0.045121933, 0.528148739), (0, 0))
            ThreePointArc((0, 0), (0.52880519, 0.005593324), (1.05761038, 0))
        make_face()
    extrude(amount=50)
    with BuildSketch(Plane(origin=(0, -15.2907849, 19.778571666), x_dir=(0, -0.6854294173424877, 0.7281390758924683), z_dir=(1, 0, 0)), Plane(origin=(0, -21.133307653, 13.356021401), x_dir=(0, -0.8931311966440857, 0.4497962489629092), z_dir=(1, 0, 0)), Plane(origin=(0, 1, 24.979991994), x_dir=(0, -0.057030620193220485, 0.9983724296876275), z_dir=(1, 0, 0)), Plane(origin=(0, -7.603967821, 23.815534287), x_dir=(0, -0.3950547344485598, 0.9186575840811296), z_dir=(1, 0, 0)), Plane(origin=(0, -24.426841608, 5.322537841), x_dir=(0, -0.9931081724177778, 0.11720135612279145), z_dir=(1, 0, 0)), Plane(origin=(0, -24.774137963, -3.352922335), x_dir=(0, -0.9733016458822474, -0.2295297499735233), z_dir=(1, 0, 0)), Plane(origin=(0, -22.133307653, -11.623970593), x_dir=(0, -0.8361005764508735, -0.5485761807247167), z_dir=(1, 0, 0)), Plane(origin=(0, -16.822873787, -18.492996446), x_dir=(0, -0.5980534379692162, -0.801456227958334), z_dir=(1, 0, 0)), Plane(origin=(0, -9.483353063, -23.131494), x_dir=(0, -0.2878722285397483, -0.9576688258659979), z_dir=(1, 0, 0)), Plane(origin=(0, -1, -24.979991994), x_dir=(0, 0.05703062019321046, -0.9983724296876278), z_dir=(1, 0, 0)), Plane(origin=(0, 7.603967821, -23.815534287), x_dir=(0, 0.3950547344485651, -0.9186575840811275), z_dir=(1, 0, 0)), Plane(origin=(0, 15.2907849, -19.778571666), x_dir=(0, 0.6854294173424931, -0.7281390758924633), z_dir=(1, 0, 0)), Plane(origin=(0, 21.133307653, -13.356021401), x_dir=(0, 0.8931311966440877, -0.44979624896290515), z_dir=(1, 0, 0)), Plane(origin=(0, 24.774137963, 3.352922335), x_dir=(0, 0.9733016458822443, 0.22952974997353692), z_dir=(1, 0, 0)), Plane(origin=(0, 22.133307653, 11.623970593), x_dir=(0, 0.836100576450868, 0.5485761807247248), z_dir=(1, 0, 0)), Plane(origin=(0, 16.822873787, 18.492996446), x_dir=(0, 0.598053437969207, 0.8014562279583408), z_dir=(1, 0, 0))) as fillet5_piece_2:
        with BuildLine():
            CenterArc((1.078715845, 0.999826701), FILLET5_R, 176.8622147, 92.071085144)
            ThreePointArc((0.080215055, 1.054564015), (0.045684741, 0.526857779), (0, 0))
            ThreePointArc((0, 0), (0.530049745, 0.004934224), (1.06009949, 0))
        make_face()
    extrude(amount=50)
    with BuildSketch(Plane(origin=(50, 24.426841608, -5.322537841), x_dir=(0, 0.9931081724177783, -0.11720135612278652), z_dir=(-1, 0, 0))) as fillet5_piece_3:
        with BuildLine():
            CenterArc((1.078715845, -0.999826701), FILLET5_R, 91.066700156, 92.071085144)
            ThreePointArc((0.080215055, -1.054564015), (0.045684741, -0.526857779), (0, 0))
            ThreePointArc((0, 0), (0.530049745, -0.004934224), (1.06009949, 0))
        make_face()
    extrude(amount=50)

    # Sketch3 → Cut-Extrude2 (cut, two sides: drawn at the far end of the back side and taken through both)
    with BuildSketch(Plane(origin=(50, 0, 0), x_dir=(0, 0, -1), z_dir=(1, 0, 0)).offset(-CUT_EXTRUDE2_DEPTH_BACK)):
        Circle(SKETCH3_R)
    extrude(amount=CUT_EXTRUDE2_DEPTH + CUT_EXTRUDE2_DEPTH_BACK, mode=Mode.SUBTRACT)


solid = part.part
